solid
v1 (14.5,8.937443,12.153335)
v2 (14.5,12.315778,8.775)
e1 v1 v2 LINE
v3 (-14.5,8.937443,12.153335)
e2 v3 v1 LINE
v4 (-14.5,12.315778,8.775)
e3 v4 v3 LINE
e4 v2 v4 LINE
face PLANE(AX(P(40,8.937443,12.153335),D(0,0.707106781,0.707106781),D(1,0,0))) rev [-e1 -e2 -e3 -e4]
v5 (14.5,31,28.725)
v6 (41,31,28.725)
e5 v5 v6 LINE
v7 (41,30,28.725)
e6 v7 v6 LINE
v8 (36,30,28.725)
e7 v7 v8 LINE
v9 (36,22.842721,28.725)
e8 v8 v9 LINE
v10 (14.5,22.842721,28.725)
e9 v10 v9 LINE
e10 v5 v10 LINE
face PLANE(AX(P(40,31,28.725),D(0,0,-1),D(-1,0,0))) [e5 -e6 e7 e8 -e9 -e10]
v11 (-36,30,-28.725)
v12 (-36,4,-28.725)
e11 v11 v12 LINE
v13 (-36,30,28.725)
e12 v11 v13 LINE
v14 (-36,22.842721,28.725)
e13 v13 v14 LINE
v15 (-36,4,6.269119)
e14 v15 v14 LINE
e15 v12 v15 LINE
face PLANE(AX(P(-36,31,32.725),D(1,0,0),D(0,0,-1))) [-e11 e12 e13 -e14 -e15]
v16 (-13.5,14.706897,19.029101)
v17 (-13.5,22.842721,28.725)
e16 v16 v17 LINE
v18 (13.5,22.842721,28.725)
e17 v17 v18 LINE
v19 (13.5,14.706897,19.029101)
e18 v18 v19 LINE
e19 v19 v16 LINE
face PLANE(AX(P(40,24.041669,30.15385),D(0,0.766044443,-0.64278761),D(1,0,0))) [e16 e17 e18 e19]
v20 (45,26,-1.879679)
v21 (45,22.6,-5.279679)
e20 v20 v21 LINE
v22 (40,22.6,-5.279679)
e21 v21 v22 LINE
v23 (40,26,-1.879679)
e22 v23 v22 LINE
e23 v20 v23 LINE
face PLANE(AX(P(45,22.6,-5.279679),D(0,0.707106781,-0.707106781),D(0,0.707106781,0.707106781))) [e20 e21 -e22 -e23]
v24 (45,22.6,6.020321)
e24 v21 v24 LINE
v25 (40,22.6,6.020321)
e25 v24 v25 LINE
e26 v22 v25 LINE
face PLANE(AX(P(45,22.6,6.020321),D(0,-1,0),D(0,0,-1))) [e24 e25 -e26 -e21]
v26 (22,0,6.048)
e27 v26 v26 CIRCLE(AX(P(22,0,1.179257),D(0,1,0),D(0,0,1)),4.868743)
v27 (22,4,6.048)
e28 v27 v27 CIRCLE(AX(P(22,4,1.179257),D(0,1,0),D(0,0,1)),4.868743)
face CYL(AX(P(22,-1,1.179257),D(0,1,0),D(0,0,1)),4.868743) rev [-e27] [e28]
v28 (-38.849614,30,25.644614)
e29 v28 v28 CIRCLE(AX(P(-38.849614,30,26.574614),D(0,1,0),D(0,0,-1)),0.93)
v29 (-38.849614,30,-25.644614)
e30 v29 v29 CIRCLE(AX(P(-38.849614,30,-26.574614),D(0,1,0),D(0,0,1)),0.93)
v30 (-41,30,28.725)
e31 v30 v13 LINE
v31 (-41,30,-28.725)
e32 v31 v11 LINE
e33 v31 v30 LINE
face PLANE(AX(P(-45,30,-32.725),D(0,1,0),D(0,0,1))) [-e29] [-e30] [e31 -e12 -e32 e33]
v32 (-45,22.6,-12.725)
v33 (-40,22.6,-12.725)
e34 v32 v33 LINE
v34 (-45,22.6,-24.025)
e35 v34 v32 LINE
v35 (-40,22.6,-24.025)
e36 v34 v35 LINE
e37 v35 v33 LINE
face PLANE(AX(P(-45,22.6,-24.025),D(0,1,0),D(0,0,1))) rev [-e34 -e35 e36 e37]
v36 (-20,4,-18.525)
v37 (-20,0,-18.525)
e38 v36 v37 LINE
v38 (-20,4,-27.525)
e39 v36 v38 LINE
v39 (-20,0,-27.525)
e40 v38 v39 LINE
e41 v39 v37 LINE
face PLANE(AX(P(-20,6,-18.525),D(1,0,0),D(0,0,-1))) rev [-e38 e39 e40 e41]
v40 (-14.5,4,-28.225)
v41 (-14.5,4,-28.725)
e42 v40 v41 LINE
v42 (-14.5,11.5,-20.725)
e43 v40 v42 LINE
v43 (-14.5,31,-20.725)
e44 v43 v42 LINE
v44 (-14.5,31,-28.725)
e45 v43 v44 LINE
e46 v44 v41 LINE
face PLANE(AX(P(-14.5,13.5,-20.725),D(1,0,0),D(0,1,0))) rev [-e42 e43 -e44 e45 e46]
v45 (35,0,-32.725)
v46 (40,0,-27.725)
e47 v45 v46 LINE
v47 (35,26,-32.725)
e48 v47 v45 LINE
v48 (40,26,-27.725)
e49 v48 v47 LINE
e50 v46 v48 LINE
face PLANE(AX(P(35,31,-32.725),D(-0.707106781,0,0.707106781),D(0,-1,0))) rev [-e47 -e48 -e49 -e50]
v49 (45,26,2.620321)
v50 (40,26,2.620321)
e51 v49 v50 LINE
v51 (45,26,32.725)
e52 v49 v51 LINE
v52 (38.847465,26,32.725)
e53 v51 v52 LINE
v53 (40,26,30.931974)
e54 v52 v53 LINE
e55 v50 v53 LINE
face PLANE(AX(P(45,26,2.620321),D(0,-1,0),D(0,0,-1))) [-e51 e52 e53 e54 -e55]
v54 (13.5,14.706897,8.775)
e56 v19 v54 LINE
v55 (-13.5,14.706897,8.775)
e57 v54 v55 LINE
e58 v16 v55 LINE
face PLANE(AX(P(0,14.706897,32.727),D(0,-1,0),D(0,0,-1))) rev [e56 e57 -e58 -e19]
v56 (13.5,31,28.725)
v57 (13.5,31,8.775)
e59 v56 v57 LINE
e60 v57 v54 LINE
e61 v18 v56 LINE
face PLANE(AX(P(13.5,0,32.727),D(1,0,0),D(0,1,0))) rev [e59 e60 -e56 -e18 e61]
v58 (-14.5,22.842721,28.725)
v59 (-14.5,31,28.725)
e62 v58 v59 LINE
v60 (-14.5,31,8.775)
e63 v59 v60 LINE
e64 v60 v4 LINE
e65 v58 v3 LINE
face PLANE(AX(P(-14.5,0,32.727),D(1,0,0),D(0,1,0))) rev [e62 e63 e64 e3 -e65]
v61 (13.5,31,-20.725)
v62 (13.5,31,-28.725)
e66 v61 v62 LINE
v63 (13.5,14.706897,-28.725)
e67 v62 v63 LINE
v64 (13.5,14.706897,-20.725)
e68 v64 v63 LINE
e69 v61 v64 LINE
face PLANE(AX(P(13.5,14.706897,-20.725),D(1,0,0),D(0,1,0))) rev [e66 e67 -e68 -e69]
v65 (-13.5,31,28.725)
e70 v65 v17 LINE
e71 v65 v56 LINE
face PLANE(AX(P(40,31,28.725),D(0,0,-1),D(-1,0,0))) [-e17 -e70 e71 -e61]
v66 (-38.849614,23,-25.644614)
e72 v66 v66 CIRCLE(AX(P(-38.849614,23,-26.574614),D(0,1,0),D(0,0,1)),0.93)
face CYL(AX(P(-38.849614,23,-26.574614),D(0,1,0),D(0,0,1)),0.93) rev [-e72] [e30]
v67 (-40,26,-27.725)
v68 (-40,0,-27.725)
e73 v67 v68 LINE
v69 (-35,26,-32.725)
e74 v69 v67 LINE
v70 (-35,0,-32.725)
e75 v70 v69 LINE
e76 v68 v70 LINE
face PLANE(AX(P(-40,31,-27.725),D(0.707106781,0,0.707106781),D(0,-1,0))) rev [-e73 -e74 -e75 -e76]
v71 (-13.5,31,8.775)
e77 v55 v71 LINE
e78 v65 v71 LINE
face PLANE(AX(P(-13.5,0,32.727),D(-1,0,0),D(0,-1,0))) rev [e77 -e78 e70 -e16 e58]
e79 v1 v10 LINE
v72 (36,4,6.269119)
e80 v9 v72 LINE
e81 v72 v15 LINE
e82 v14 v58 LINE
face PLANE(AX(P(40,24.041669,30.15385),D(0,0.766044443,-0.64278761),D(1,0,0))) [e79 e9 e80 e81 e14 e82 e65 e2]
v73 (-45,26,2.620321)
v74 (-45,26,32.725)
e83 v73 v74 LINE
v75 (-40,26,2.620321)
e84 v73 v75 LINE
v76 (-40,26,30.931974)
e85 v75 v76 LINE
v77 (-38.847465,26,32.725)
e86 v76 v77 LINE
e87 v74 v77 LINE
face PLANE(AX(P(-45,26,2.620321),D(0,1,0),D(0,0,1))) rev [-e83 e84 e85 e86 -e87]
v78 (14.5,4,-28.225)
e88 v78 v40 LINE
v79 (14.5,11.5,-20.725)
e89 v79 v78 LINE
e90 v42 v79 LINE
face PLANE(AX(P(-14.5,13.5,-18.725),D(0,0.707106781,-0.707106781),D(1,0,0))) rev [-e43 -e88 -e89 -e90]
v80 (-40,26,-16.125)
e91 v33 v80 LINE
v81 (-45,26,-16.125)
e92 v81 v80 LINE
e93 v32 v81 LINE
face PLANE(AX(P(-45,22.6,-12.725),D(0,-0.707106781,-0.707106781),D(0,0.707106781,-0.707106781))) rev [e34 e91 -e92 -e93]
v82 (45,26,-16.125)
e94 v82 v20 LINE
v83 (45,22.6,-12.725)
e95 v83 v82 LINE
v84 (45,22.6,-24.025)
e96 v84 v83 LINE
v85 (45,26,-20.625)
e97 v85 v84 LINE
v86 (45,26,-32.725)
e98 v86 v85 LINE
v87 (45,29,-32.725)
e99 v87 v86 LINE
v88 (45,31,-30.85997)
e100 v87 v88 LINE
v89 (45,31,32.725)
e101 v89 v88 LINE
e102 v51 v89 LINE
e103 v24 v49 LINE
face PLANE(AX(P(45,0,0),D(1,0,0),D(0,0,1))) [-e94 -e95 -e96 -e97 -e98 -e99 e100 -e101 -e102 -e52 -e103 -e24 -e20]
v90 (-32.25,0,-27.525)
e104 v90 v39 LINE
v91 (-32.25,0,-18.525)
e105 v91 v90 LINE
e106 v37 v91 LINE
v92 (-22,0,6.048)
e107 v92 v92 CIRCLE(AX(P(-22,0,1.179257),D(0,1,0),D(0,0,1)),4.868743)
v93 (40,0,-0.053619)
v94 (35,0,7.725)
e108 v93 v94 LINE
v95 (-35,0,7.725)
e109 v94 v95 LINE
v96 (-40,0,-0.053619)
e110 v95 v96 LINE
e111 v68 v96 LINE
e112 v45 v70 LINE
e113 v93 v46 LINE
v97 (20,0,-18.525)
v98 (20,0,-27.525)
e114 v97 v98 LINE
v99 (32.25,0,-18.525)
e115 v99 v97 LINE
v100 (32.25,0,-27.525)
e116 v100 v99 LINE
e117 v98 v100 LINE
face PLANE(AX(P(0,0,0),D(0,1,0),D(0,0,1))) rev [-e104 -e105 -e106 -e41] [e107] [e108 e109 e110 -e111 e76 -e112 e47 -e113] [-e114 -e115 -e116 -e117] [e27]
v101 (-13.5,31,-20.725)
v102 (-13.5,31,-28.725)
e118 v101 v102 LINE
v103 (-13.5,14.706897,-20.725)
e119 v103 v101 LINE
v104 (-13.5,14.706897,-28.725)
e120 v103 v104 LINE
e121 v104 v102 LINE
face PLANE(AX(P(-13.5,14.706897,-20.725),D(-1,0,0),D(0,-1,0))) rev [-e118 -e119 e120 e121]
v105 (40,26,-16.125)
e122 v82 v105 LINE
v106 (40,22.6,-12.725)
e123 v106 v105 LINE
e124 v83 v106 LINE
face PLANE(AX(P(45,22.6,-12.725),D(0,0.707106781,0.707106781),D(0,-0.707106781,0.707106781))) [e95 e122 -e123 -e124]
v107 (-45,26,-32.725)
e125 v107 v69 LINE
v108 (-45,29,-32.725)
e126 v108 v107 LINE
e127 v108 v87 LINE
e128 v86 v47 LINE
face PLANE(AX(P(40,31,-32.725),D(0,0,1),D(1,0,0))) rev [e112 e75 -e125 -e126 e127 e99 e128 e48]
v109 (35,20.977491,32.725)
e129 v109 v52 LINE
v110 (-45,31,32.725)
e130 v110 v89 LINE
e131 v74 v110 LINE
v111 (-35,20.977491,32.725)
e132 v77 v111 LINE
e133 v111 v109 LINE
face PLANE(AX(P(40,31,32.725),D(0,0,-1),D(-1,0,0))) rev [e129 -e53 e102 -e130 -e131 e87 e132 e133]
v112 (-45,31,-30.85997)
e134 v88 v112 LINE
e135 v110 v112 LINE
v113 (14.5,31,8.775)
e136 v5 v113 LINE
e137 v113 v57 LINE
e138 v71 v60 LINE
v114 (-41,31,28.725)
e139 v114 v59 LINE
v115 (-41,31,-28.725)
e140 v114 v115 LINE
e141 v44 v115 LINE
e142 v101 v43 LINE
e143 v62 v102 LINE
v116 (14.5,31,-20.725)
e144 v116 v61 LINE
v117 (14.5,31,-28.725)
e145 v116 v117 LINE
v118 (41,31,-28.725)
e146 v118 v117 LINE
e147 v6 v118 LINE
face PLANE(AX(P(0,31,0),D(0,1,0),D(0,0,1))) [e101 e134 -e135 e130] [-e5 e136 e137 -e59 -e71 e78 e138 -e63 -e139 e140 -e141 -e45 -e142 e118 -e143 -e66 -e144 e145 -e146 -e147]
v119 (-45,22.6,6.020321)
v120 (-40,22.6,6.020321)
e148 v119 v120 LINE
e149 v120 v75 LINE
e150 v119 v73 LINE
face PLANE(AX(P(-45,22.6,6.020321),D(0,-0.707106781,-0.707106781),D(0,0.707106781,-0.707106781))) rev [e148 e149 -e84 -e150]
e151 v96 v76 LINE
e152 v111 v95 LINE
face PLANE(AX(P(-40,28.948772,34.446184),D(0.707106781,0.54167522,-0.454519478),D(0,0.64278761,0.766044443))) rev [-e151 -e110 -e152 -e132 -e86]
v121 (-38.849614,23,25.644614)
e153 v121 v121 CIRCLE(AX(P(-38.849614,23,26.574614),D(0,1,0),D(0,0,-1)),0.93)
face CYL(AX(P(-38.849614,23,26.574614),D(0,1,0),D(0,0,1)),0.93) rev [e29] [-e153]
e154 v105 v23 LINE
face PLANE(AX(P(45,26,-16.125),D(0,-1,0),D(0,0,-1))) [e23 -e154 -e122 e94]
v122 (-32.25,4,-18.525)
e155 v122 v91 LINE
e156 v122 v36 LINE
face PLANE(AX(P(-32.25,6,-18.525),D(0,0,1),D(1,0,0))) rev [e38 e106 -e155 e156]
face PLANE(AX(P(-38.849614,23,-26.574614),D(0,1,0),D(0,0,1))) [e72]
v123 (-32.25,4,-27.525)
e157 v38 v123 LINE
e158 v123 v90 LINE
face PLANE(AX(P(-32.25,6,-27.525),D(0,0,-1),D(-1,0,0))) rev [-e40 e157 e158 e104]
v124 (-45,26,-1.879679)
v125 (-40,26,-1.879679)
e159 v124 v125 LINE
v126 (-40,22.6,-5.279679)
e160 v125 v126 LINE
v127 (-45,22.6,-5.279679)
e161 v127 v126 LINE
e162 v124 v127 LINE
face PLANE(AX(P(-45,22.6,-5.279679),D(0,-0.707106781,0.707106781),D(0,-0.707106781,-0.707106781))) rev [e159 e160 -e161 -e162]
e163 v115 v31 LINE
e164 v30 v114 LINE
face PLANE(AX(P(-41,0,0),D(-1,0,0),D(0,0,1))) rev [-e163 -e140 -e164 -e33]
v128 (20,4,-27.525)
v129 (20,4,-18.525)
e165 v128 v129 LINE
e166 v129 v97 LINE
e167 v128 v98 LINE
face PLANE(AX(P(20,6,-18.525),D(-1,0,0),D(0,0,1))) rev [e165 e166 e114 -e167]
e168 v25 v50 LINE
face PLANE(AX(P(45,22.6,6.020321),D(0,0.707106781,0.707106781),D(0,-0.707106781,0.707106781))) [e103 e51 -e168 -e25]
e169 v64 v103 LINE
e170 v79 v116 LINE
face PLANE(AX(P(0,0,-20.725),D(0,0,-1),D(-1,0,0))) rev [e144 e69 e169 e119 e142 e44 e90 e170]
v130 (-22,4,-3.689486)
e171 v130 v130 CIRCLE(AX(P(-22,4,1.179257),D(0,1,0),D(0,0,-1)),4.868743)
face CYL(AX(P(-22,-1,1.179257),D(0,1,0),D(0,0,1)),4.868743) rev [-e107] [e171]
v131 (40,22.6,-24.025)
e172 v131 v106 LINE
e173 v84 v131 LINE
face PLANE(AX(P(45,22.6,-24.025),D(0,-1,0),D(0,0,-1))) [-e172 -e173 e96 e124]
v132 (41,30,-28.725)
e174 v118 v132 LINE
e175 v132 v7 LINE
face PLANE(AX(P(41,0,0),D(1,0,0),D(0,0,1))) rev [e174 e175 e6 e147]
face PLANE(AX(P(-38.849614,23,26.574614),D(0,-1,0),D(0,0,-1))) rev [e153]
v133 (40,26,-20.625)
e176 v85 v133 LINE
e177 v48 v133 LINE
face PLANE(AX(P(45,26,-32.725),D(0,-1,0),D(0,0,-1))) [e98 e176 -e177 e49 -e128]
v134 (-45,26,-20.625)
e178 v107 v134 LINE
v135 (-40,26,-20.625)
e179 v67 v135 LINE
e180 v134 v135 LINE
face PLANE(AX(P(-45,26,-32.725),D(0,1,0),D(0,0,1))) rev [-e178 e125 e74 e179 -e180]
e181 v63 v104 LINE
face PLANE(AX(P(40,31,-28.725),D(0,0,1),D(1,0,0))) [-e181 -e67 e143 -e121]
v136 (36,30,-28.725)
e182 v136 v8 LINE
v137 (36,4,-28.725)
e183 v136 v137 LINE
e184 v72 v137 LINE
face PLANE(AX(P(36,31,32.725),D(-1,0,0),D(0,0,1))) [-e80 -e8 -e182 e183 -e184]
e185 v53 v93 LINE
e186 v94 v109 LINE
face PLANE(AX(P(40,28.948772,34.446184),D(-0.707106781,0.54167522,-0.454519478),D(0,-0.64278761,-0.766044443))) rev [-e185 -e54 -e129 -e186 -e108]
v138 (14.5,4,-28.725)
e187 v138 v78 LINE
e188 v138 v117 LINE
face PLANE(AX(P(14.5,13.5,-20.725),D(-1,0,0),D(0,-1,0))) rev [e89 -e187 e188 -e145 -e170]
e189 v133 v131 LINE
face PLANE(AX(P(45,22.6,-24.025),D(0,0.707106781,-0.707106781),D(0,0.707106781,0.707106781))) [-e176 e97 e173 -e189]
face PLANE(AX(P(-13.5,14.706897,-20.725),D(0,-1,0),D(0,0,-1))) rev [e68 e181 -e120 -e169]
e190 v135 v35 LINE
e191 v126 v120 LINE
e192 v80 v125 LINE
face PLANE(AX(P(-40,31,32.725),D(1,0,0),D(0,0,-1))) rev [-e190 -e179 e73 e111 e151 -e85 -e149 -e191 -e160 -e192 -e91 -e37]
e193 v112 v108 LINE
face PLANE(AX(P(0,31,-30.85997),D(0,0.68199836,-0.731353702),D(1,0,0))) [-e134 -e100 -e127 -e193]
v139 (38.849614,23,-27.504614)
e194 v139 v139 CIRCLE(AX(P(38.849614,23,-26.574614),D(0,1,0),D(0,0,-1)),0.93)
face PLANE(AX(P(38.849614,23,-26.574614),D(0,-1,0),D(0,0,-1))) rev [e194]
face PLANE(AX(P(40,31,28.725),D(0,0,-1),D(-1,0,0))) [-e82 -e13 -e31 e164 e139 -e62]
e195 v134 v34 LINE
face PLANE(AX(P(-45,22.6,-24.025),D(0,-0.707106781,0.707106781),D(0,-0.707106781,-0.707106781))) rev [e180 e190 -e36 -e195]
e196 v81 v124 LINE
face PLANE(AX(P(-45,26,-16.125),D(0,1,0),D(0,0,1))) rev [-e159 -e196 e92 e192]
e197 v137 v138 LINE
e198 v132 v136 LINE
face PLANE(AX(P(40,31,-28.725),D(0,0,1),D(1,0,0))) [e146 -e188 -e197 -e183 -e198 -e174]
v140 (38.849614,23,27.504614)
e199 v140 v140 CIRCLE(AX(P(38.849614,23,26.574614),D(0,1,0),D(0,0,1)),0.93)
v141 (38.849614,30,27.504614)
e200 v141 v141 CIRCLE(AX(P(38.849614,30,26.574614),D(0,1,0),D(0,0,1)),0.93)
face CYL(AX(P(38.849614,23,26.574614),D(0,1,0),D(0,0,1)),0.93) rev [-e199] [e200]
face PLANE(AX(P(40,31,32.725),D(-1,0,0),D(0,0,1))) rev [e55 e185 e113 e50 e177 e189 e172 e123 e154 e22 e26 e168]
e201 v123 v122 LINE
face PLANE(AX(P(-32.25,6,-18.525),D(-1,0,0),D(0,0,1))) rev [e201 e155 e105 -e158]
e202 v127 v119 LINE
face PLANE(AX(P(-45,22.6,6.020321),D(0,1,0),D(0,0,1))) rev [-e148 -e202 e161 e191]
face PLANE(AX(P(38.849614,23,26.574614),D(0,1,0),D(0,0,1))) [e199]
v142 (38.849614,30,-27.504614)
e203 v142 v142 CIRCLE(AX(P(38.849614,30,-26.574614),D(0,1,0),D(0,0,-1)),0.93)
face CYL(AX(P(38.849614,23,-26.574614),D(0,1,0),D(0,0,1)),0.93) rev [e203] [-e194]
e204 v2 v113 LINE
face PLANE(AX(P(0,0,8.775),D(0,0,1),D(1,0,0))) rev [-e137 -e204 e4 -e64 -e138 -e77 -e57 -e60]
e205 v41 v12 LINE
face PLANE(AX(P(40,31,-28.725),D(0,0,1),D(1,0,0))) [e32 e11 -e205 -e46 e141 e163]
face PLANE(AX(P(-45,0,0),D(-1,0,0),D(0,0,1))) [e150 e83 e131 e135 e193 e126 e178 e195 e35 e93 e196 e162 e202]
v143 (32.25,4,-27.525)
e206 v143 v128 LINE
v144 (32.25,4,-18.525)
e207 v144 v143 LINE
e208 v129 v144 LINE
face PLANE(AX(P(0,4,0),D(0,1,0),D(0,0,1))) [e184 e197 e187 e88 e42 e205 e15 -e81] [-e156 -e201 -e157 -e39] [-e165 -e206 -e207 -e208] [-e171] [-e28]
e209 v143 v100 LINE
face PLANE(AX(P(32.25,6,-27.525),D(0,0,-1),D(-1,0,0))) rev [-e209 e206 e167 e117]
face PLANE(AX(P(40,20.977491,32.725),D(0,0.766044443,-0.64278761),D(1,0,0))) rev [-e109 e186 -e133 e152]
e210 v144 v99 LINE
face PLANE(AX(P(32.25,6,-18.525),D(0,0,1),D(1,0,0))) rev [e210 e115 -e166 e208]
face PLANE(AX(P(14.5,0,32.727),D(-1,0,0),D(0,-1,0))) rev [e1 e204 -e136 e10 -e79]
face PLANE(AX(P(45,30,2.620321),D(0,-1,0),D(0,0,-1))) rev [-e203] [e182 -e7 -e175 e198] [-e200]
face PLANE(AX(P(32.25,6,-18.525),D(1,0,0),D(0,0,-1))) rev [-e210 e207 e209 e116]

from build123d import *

# Parameters (mm, degrees)
SKETCH1_W           = 80
SKETCH1_H           = 65.45
BOSS_EXTRUDE1_DEPTH = 31
BOSS_EXTRUDE3_DEPTH = 5
CHAMFER2_SIZE       = 25
CHAMFER2_SIZE2      = 20.977490779
SHELL2_START        = -36
SHELL2_DEPTH        = 72
SHELL2_START_2      = -41
SHELL2_2_OUTLINE_W  = 1
SHELL2_2_OUTLINE_H  = 57.45
SHELL2_2_DEPTH      = 82
SKETCH6_R           = 4.86874318
CUT_EXTRUDE1_DEPTH  = 5
BOSS_EXTRUDE4_DEPTH = 8
BOSS_EXTRUDE5_REACH = 107.939
BOSS_EXTRUDE5_START = 29.5
SKETCH10_W          = 12.25
SKETCH10_H          = 9
CUT_EXTRUDE2_DEPTH  = 6
CHAMFER3_SIZE       = 2
CHAMFER3_SIZE2      = 1.865030172
CHAMFER4_SIZE       = 7.098078142
CHAMFER4_SIZE_2     = 10
CHAMFER5_SIZE       = 10
CHAMFER7_SIZE       = 5
SKETCH11_R          = 0.93
CUT_EXTRUDE3_DEPTH  = 7


# Read off the part's stored shape, not the designer's step: Shell2
with BuildPart() as part:
    # Sketch1 → Boss-Extrude1 (new body)
    with BuildSketch(Plane(origin=(0, 0, 0), x_dir=(1, 0, 0), z_dir=(0, 1, 0))):
        Rectangle(SKETCH1_W, SKETCH1_H)
    extrude(amount=BOSS_EXTRUDE1_DEPTH)

    # Sketch5 → Boss-Extrude3 (add)
    with BuildSketch(Plane.ZY.offset(40)):
        Polygon((-32.725, 31), (-20.625, 31), (8.005, 31), (32.725, 31), (32.725, 26), (2.6203214, 26), (6.0203214, 22.6), (-5.2796786, 22.6), (-1.8796786, 26), (-16.125, 26), (-12.725, 22.6), (-24.025, 22.6), (-20.625, 26), (-32.725, 26), align=None)
    boss_extrude3 = extrude(amount=BOSS_EXTRUDE3_DEPTH)

    # Mirror1: Boss-Extrude3 across plane
    add(boss_extrude3.mirror(Plane(origin=(0, 0, 0), x_dir=(0, 0, 1), z_dir=(1, 0, 0))))

    # Chamfer2
    chamfer2_edges = [part.edges().sort_by_distance(p)[0] for p in [
        (0, 0, 32.725),
    ]]
    chamfer2_side = [part.faces().sort_by_distance(p)[0] for p in [
        (0, 0, 0),
    ]]
    chamfer(chamfer2_edges, length=CHAMFER2_SIZE, length2=CHAMFER2_SIZE2, reference=chamfer2_side[0])

    # Shell2 outline → Shell2 (cut)
    with BuildSketch(Plane.YZ.offset(SHELL2_START)):
        Polygon((22.842721412, 28.725), (4, 6.269119063), (4, -28.725), (31, -28.725), (31, 28.725), align=None)
    extrude(amount=SHELL2_DEPTH, mode=Mode.SUBTRACT)

    # Shell2 2 outline → Shell2 2 (cut)
    with BuildSketch(Plane.YZ.offset(SHELL2_START_2)):
        with Locations((30.5, 0)):
            Rectangle(SHELL2_2_OUTLINE_W, SHELL2_2_OUTLINE_H)
    extrude(amount=SHELL2_2_DEPTH, mode=Mode.SUBTRACT)

    # Sketch6 → Cut-Extrude1 (cut)
    with BuildSketch(Plane(origin=(0, 4, 24.632603001), x_dir=(1, 0, 0), z_dir=(0, 1, 0))):
        with Locations(Location((22, 23.453346141, 0), (0, 0, 270))):
            Circle(SKETCH6_R)
        with Locations(Location((-22, 23.453346141, 0), (0, 0, 270))):
            Circle(SKETCH6_R)
    extrude(amount=-CUT_EXTRUDE1_DEPTH, mode=Mode.SUBTRACT)

    # Sketch7 → Boss-Extrude4 (add)
    with BuildSketch(Plane.XY.offset(-28.725)):
        Polygon((-14.5, 13.5), (14.5, 13.5), (14.5, 31), (13.5, 31), (13.5, 14.706896552), (-13.5, 14.706896552), (-13.5, 31), (-14.5, 31), align=None)
    extrude(amount=BOSS_EXTRUDE4_DEPTH)

    # Sketch8 → Boss-Extrude5 (add, up to next)
    with BuildSketch(Plane.XY.offset(-20.725).offset(BOSS_EXTRUDE5_START), mode=Mode.PRIVATE) as boss_extrude5_sk1:
        Polygon((-13.5, 14.706896552), (-13.5, 31), (-14.5, 31), (-14.5, 14.706896552), (-14.5, 13.5), (-13.5, 13.5), (13.5, 13.5), (14.5, 13.5), (14.5, 14.706896552), (14.5, 31), (13.5, 31), (13.5, 14.706896552), align=None)
    boss_extrude5_tool1 = extrude(boss_extrude5_sk1.sketch, amount=BOSS_EXTRUDE5_REACH, mode=Mode.PRIVATE) - part.part
    add(boss_extrude5_tool1.solids().sort_by_distance((14, 30.661289, 8.775))[0])

    # Sketch10 → Cut-Extrude2 (cut)
    with BuildSketch(Plane.XZ):
        with Locations((-26.125, -23.025)):
            Rectangle(SKETCH10_W, SKETCH10_H)
        with Locations((26.125, -23.025)):
            Rectangle(SKETCH10_W, SKETCH10_H)
    extrude(amount=-CUT_EXTRUDE2_DEPTH, mode=Mode.SUBTRACT)

    # Chamfer3
    chamfer3_edges = [part.edges().sort_by_distance(p)[0] for p in [
        (0, 31, -32.725),
    ]]
    chamfer3_side = [part.faces().sort_by_distance(p)[0] for p in [
        (0, 15.756916996, -32.725),
    ]]
    chamfer(chamfer3_edges, length=CHAMFER3_SIZE, length2=CHAMFER3_SIZE2, reference=chamfer3_side[0])

    # Chamfer4
    # the kernel refuses this chamfer: 10, 7.098078142 mm, written as the material it adds along each edge
    with BuildSketch(Plane(origin=(14.5, 13.5, 17.590778193), x_dir=(0, -0.6849156240265527, -0.728622390518105), z_dir=(-1, 0, 0))) as chamfer4_piece_1_section:
        Polygon((CHAMFER4_SIZE * 0.998412410217, -CHAMFER4_SIZE * 0.0563263630269), (CHAMFER4_SIZE_2 * 0.728622390518, -CHAMFER4_SIZE_2 * 0.684915624027), (0, 0), align=None)
    chamfer4_piece_1 = extrude(amount=29, mode=Mode.PRIVATE)
    chamfer4_piece_1 = split(chamfer4_piece_1, bisect_by=Plane(origin=(0, 11.943437141, 8.775), z_dir=(0, 0, 1)), keep=Keep.TOP, mode=Mode.PRIVATE)
    add(chamfer4_piece_1)

    # Chamfer5
    # the kernel refuses this chamfer: 10 mm, written as the material it adds along each edge
    with BuildSketch(Plane(origin=(-14.5, 13.5, -28.725), x_dir=(0, 0.027495876610586317, 0.9996219169112968), z_dir=(1, 0, 0))) as chamfer5_piece_1_section:
        Polygon((CHAMFER5_SIZE * 0.999621916911, CHAMFER5_SIZE * 0.0274958766106), (-CHAMFER5_SIZE * 0.0274958766106, CHAMFER5_SIZE * 0.999621916911), (0, 0), align=None)
    chamfer5_piece_1 = extrude(amount=29, mode=Mode.PRIVATE)
    chamfer5_piece_1 = split(chamfer5_piece_1, bisect_by=Plane(origin=(0, 10.042815877, -20.725), z_dir=(0, 0, -1)), keep=Keep.TOP, mode=Mode.PRIVATE)
    add(chamfer5_piece_1)

    # Chamfer7
    chamfer7_edges = [part.edges().sort_by_distance(p)[0] for p in [
        (40, 10.48874539, 20.225),
        (-40, 10.48874539, 20.225),
        (-40, 13, -32.725),
        (40, 13, -32.725),
    ]]
    chamfer(chamfer7_edges, length=CHAMFER7_SIZE)

    # Sketch11 → Cut-Extrude3 (cut)
    with BuildSketch(Plane(origin=(0, 30, 0), x_dir=(1, 0, 0), z_dir=(0, 1, 0))):
        with Locations(Location((38.849613738, -26.574613738, 0), (0, 0, 270))):
            Circle(SKETCH11_R)
        with Locations(Location((38.849613738, 26.574613738, 0), (0, 0, 90))):
            Circle(SKETCH11_R)
        with Locations(Location((-38.849613738, 26.574613738, 0), (0, 0, 270))):
            Circle(SKETCH11_R)
        with Locations(Location((-38.849613738, -26.574613738, 0), (0, 0, 90))):
            Circle(SKETCH11_R)
    extrude(amount=-CUT_EXTRUDE3_DEPTH, mode=Mode.SUBTRACT)


solid = part.part
